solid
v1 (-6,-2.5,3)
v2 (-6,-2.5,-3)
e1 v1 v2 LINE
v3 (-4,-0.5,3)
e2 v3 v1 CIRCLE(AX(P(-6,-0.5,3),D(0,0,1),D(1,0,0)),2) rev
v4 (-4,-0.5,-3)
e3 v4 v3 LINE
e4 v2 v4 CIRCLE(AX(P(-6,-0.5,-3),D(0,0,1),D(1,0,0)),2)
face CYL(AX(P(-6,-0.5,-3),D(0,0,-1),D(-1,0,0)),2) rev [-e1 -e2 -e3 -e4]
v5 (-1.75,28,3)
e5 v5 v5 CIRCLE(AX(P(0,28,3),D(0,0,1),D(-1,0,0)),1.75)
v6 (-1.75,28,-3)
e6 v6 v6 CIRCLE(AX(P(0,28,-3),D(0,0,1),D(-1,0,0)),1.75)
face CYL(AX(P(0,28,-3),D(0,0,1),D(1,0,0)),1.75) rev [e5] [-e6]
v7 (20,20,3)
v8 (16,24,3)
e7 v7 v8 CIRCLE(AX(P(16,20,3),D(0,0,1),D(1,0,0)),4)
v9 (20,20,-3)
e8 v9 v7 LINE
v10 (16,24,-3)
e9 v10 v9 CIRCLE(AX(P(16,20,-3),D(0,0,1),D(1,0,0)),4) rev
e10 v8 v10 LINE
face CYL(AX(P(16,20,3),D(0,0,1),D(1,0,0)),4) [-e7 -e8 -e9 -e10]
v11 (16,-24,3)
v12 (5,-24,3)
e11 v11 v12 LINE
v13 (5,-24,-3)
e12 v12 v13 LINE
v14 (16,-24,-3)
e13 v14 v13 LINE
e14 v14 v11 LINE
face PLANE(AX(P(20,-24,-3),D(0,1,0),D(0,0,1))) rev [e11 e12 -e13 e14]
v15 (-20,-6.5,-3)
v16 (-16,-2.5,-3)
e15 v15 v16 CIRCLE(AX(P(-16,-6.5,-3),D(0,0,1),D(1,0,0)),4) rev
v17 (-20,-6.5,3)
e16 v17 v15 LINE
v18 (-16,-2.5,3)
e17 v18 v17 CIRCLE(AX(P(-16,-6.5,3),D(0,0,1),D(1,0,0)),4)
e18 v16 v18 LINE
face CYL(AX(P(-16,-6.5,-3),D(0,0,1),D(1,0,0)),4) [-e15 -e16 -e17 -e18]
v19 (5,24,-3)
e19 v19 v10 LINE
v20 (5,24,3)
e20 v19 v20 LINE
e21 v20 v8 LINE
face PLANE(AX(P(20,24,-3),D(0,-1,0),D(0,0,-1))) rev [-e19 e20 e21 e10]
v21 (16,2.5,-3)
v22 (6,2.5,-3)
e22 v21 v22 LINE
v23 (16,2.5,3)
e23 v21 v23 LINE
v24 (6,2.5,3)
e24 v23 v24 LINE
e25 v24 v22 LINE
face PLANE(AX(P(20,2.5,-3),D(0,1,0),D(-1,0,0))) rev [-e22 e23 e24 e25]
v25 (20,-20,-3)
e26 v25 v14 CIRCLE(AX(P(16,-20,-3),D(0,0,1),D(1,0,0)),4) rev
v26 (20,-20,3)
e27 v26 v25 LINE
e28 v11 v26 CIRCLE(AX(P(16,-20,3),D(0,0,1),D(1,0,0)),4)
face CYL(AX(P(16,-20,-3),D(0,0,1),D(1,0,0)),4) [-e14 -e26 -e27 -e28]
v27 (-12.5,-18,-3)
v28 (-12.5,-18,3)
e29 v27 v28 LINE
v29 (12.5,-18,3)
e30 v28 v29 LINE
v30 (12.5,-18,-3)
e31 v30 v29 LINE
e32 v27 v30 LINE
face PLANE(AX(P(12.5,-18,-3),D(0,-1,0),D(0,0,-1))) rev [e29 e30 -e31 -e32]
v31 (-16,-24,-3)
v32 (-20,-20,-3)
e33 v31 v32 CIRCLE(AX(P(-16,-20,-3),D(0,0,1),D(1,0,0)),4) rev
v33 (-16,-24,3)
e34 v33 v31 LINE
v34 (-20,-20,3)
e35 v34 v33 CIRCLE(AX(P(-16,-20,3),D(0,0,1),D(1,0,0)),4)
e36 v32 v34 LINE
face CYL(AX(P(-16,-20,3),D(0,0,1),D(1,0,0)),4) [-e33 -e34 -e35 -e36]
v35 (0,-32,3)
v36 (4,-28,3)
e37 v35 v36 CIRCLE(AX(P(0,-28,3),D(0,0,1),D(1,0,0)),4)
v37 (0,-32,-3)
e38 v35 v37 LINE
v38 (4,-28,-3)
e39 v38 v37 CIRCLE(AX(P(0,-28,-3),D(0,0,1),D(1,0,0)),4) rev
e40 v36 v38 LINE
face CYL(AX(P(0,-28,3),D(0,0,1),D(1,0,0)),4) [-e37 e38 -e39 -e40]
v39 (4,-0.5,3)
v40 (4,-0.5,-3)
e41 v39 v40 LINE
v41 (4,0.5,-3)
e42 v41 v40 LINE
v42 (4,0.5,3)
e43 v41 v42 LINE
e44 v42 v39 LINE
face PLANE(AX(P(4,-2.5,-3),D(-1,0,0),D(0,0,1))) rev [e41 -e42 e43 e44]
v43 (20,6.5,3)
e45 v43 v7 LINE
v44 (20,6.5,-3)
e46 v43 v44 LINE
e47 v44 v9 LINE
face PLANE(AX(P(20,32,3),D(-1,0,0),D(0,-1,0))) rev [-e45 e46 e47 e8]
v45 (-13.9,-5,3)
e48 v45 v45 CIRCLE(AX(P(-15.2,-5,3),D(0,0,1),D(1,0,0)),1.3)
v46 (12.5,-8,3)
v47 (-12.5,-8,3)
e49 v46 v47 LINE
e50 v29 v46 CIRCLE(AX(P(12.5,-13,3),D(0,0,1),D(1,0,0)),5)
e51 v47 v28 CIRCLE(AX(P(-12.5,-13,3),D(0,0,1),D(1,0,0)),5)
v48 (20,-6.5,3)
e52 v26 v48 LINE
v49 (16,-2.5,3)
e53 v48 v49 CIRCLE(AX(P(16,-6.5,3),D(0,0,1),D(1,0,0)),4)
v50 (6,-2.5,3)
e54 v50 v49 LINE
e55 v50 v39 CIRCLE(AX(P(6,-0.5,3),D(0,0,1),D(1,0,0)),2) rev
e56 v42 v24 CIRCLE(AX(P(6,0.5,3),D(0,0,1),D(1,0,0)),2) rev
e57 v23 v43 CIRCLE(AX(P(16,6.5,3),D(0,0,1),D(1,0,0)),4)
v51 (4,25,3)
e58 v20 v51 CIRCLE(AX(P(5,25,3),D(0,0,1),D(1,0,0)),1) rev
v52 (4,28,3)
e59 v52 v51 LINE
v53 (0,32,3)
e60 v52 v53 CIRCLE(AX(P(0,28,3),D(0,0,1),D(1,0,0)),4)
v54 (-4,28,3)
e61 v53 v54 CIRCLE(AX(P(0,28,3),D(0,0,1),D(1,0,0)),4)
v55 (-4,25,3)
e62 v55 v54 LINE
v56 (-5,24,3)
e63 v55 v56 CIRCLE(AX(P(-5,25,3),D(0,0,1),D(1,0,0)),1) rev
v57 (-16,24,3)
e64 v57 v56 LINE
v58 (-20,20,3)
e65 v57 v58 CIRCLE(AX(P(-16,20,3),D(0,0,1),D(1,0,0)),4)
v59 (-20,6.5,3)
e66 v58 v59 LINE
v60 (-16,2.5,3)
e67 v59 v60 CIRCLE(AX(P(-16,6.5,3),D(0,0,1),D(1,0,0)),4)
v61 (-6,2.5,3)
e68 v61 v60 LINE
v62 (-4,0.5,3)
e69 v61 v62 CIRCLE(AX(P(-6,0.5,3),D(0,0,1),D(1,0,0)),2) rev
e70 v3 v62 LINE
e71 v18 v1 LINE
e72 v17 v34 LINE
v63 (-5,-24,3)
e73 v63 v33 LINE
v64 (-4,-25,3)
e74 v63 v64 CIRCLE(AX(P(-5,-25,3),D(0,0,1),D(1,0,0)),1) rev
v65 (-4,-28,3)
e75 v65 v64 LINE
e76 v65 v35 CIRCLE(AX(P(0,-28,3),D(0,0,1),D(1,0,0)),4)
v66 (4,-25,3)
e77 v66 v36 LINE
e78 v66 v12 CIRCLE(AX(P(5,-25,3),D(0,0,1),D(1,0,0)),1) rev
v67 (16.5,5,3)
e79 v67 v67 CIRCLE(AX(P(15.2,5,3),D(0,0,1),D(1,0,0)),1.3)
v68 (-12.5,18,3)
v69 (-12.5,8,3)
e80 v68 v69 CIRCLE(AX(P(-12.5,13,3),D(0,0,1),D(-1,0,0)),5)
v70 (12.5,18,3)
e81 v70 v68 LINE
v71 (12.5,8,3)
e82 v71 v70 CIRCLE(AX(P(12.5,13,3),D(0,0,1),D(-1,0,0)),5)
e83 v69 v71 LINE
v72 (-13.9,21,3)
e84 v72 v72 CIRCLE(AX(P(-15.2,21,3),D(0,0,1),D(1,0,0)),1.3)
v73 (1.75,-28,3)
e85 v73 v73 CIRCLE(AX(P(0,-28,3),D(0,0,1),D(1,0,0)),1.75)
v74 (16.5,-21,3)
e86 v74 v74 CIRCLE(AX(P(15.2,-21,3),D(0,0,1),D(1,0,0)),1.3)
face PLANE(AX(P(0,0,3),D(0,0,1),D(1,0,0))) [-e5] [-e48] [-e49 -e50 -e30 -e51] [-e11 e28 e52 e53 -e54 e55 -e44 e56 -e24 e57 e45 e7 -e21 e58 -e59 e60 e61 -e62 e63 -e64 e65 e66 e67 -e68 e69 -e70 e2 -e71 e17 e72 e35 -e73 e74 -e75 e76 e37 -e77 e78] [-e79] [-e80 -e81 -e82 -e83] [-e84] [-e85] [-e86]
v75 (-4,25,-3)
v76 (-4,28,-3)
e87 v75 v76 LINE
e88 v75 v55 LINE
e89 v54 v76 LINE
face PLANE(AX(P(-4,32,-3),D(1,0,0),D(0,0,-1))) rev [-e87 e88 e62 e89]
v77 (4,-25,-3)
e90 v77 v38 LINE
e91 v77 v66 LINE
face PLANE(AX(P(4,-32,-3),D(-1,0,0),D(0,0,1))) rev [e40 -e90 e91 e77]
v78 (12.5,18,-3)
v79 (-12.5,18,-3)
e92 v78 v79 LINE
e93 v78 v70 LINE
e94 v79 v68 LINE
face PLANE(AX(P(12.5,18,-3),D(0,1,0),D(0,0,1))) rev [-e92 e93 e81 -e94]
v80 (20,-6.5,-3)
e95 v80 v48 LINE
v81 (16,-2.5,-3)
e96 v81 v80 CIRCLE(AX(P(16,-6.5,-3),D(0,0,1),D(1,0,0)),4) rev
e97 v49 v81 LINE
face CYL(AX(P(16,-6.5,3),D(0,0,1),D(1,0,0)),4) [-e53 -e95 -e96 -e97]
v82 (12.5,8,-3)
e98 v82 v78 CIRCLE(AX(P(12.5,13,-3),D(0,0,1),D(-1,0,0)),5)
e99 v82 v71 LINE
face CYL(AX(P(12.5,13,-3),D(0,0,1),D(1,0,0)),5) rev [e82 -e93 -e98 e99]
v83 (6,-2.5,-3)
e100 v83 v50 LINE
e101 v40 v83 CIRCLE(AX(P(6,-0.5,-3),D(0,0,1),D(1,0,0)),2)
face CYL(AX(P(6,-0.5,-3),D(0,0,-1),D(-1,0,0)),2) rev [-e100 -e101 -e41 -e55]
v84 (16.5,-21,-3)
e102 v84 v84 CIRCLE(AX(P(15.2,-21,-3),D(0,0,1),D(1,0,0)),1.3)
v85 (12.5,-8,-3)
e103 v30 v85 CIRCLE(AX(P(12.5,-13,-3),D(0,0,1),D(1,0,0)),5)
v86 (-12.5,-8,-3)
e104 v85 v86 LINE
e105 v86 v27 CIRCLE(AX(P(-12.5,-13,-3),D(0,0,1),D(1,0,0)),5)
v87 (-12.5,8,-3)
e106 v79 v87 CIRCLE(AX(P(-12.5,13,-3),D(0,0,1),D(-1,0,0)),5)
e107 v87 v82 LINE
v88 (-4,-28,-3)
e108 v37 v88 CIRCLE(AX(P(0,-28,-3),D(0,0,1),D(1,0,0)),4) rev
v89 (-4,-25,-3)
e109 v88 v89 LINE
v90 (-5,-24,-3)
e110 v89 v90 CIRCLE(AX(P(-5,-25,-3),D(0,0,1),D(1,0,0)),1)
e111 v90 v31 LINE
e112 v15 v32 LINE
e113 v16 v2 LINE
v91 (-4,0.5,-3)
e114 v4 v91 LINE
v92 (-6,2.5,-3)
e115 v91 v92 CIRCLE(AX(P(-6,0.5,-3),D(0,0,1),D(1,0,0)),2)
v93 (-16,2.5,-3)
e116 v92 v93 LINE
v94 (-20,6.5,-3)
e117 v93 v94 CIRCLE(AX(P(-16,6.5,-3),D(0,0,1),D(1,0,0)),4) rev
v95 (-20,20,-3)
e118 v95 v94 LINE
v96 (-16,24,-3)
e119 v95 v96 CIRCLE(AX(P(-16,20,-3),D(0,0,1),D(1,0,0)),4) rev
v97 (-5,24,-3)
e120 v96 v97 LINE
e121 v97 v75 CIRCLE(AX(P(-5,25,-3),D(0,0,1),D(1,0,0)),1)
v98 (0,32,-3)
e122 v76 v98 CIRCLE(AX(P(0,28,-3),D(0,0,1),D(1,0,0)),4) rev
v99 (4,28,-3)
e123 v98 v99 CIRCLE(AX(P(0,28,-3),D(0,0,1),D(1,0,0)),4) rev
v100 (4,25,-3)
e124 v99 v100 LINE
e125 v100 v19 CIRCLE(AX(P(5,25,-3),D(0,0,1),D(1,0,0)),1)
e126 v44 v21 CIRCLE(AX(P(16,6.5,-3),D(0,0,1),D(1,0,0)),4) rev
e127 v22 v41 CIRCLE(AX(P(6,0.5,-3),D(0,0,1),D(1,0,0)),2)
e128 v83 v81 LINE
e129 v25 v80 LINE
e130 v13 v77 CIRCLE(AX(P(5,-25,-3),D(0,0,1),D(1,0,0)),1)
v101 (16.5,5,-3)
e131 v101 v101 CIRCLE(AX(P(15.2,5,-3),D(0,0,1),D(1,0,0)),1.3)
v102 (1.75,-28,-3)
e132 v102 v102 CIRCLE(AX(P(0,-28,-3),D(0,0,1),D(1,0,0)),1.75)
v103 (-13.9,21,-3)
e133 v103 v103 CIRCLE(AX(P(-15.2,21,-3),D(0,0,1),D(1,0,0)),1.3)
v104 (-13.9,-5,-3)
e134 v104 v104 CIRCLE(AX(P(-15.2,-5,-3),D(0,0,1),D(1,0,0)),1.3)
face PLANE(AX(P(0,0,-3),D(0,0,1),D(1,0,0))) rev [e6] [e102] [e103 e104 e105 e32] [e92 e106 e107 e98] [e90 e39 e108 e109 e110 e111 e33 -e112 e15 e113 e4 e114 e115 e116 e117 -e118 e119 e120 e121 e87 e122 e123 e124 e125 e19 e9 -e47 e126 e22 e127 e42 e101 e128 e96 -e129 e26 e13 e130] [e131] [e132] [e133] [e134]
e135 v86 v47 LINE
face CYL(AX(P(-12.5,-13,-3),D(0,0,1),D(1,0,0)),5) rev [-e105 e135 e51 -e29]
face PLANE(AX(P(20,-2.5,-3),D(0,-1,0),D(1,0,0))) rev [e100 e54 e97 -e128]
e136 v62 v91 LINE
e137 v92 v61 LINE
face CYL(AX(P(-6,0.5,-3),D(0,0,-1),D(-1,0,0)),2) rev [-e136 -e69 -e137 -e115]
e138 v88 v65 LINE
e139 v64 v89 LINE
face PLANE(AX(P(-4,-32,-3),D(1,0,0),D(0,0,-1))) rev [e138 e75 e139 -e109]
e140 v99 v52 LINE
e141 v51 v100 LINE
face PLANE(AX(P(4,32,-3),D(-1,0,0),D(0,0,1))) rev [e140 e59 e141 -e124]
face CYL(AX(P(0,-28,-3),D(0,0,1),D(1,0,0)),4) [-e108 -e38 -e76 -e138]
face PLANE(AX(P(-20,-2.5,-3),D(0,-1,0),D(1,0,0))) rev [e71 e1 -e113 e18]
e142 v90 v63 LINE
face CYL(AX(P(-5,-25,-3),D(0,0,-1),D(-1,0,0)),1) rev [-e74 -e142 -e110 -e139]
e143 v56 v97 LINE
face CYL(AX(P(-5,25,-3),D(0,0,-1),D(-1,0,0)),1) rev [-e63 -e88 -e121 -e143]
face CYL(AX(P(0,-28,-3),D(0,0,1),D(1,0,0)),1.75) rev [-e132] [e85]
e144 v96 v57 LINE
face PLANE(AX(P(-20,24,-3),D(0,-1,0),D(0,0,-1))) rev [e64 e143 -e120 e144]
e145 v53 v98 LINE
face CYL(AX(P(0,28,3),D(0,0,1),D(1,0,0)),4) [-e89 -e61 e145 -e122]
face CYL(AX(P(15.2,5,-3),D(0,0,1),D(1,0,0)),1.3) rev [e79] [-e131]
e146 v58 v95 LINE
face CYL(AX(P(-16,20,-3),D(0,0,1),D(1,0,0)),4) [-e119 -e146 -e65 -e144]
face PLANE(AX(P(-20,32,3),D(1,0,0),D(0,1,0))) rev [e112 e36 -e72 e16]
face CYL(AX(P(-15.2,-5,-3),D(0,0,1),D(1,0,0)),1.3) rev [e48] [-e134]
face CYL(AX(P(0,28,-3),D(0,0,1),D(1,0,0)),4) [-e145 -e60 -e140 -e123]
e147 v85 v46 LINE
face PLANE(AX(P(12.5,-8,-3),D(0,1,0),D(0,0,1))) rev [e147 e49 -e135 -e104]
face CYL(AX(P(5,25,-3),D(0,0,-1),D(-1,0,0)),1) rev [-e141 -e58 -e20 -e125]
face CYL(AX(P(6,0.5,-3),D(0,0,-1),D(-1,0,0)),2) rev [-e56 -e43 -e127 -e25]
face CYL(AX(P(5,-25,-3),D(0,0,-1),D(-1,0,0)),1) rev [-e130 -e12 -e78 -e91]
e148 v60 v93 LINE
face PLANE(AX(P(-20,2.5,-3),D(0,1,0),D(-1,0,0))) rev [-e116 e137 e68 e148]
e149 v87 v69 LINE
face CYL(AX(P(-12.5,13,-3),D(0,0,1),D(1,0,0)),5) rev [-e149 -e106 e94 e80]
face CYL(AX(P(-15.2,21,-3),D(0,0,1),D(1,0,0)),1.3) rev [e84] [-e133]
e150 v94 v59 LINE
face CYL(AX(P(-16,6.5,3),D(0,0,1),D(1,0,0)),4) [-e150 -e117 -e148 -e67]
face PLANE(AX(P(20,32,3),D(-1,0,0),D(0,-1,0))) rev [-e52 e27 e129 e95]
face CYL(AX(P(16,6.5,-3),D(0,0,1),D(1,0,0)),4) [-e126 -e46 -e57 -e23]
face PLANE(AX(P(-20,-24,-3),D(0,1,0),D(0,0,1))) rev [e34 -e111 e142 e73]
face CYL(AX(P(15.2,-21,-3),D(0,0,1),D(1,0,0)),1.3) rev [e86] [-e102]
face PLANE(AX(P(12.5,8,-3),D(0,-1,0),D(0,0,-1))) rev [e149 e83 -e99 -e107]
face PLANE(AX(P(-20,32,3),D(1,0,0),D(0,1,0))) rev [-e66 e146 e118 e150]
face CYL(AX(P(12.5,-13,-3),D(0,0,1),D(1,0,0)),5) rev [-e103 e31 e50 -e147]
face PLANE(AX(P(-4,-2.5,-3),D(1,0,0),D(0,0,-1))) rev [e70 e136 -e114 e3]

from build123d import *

# Parameters (mm, degrees)
SKETCH1_W           = 40
SKETCH1_H           = 64
BOSS_EXTRUDE1_DEPTH = 3
SKETCH3_R           = 1.3
CUT_EXTRUDE2_DEPTH  = 39.209946349
SKETCH4_R           = 1.75
CUT_EXTRUDE3_DEPTH  = 39.209946349
SKETCH5_W           = 16
SKETCH5_H           = 5
SKETCH5_H_2         = 8
CUT_EXTRUDE4_DEPTH  = 39.209946349
FILLET1_R           = 2
FILLET2_R           = 4
FILLET3_R           = 1


with BuildPart() as part:
    # Sketch1 → Boss-Extrude1 (new, symmetric)
    with BuildSketch(Plane.XY):
        Rectangle(SKETCH1_W, SKETCH1_H)
    extrude(amount=BOSS_EXTRUDE1_DEPTH, both=True)

    # Sketch3 → Cut-Extrude2 (cut, through all)
    with BuildSketch(Plane.XY.offset(3)):
        with Locations((-15.2, 21)):
            Circle(SKETCH3_R)
        with Locations((15.2, 5)):
            Circle(SKETCH3_R)
        with Locations((-15.2, -5)):
            Circle(SKETCH3_R)
        with Locations((15.2, -21)):
            Circle(SKETCH3_R)
    extrude(amount=-CUT_EXTRUDE2_DEPTH, mode=Mode.SUBTRACT)

    # Sketch4 → Cut-Extrude3 (cut, through all)
    with BuildSketch(Plane.XY.offset(3)):
        with Locations((0, -28)):
            Circle(SKETCH4_R)
        with Locations(Location((0, 28, 0), (0, 0, 180))):
            Circle(SKETCH4_R)
    extrude(amount=-CUT_EXTRUDE3_DEPTH, mode=Mode.SUBTRACT)

    # Sketch5 → Cut-Extrude4 (cut, through all)
    with BuildSketch(Plane.XY.offset(3)):
        with Locations((-12, 0)):
            Rectangle(SKETCH5_W, SKETCH5_H)
        with Locations((12, 0)):
            Rectangle(SKETCH5_W, SKETCH5_H)
        with Locations((12, -28)):
            Rectangle(SKETCH5_W, SKETCH5_H_2)
        with Locations((-12, -28)):
            Rectangle(SKETCH5_W, SKETCH5_H_2)
        with Locations((12, 28)):
            Rectangle(SKETCH5_W, SKETCH5_H_2)
        with Locations((-12, 28)):
            Rectangle(SKETCH5_W, SKETCH5_H_2)
        with BuildLine():
            Line((12.5, -18), (-12.5, -18))
            ThreePointArc((-12.5, -18), (-17.5, -13), (-12.5, -8))
            Line((-12.5, -8), (12.5, -8))
            ThreePointArc((12.5, -8), (17.5, -13), (12.5, -18))
        make_face()
        with BuildLine():
            Line((12.5, 18), (-12.5, 18))
            ThreePointArc((-12.5, 18), (-17.5, 13), (-12.5, 8))
            Line((-12.5, 8), (12.5, 8))
            ThreePointArc((12.5, 8), (17.5, 13), (12.5, 18))
        make_face()
    extrude(amount=-CUT_EXTRUDE4_DEPTH, mode=Mode.SUBTRACT)

    # Fillet1
    fillet1_edges = [part.edges().sort_by_distance(p)[0] for p in [
        (4, -2.5, 0),
        (4, 2.5, 0),
        (-4, 2.5, 0),
        (-4, -2.5, 0),
    ]]
    fillet(fillet1_edges, radius=FILLET1_R)

    # Fillet2
    fillet2_edges = [part.edges().sort_by_distance(p)[0] for p in [
        (4, -32, 0),
        (-4, -32, 0),
        (-4, 32, 0),
        (4, 32, 0),
        (20, 24, 0),
        (20, 2.5, 0),
        (-20, 24, 0),
        (-20, 2.5, 0),
        (-20, -24, 0),
        (-20, -2.5, 0),
        (20, -24, 0),
        (20, -2.5, 0),
    ]]
    fillet(fillet2_edges, radius=FILLET2_R - 0.0001)  # a hair under: the kernel refuses the full size

    # Fillet3
    fillet3_edges = [part.edges().sort_by_distance(p)[0] for p in [
        (4, 24, 0),
        (4, -24, 0),
        (-4, -24, 0),
        (-4, 24, 0),
    ]]
    fillet(fillet3_edges, radius=FILLET3_R)


solid = part.part
